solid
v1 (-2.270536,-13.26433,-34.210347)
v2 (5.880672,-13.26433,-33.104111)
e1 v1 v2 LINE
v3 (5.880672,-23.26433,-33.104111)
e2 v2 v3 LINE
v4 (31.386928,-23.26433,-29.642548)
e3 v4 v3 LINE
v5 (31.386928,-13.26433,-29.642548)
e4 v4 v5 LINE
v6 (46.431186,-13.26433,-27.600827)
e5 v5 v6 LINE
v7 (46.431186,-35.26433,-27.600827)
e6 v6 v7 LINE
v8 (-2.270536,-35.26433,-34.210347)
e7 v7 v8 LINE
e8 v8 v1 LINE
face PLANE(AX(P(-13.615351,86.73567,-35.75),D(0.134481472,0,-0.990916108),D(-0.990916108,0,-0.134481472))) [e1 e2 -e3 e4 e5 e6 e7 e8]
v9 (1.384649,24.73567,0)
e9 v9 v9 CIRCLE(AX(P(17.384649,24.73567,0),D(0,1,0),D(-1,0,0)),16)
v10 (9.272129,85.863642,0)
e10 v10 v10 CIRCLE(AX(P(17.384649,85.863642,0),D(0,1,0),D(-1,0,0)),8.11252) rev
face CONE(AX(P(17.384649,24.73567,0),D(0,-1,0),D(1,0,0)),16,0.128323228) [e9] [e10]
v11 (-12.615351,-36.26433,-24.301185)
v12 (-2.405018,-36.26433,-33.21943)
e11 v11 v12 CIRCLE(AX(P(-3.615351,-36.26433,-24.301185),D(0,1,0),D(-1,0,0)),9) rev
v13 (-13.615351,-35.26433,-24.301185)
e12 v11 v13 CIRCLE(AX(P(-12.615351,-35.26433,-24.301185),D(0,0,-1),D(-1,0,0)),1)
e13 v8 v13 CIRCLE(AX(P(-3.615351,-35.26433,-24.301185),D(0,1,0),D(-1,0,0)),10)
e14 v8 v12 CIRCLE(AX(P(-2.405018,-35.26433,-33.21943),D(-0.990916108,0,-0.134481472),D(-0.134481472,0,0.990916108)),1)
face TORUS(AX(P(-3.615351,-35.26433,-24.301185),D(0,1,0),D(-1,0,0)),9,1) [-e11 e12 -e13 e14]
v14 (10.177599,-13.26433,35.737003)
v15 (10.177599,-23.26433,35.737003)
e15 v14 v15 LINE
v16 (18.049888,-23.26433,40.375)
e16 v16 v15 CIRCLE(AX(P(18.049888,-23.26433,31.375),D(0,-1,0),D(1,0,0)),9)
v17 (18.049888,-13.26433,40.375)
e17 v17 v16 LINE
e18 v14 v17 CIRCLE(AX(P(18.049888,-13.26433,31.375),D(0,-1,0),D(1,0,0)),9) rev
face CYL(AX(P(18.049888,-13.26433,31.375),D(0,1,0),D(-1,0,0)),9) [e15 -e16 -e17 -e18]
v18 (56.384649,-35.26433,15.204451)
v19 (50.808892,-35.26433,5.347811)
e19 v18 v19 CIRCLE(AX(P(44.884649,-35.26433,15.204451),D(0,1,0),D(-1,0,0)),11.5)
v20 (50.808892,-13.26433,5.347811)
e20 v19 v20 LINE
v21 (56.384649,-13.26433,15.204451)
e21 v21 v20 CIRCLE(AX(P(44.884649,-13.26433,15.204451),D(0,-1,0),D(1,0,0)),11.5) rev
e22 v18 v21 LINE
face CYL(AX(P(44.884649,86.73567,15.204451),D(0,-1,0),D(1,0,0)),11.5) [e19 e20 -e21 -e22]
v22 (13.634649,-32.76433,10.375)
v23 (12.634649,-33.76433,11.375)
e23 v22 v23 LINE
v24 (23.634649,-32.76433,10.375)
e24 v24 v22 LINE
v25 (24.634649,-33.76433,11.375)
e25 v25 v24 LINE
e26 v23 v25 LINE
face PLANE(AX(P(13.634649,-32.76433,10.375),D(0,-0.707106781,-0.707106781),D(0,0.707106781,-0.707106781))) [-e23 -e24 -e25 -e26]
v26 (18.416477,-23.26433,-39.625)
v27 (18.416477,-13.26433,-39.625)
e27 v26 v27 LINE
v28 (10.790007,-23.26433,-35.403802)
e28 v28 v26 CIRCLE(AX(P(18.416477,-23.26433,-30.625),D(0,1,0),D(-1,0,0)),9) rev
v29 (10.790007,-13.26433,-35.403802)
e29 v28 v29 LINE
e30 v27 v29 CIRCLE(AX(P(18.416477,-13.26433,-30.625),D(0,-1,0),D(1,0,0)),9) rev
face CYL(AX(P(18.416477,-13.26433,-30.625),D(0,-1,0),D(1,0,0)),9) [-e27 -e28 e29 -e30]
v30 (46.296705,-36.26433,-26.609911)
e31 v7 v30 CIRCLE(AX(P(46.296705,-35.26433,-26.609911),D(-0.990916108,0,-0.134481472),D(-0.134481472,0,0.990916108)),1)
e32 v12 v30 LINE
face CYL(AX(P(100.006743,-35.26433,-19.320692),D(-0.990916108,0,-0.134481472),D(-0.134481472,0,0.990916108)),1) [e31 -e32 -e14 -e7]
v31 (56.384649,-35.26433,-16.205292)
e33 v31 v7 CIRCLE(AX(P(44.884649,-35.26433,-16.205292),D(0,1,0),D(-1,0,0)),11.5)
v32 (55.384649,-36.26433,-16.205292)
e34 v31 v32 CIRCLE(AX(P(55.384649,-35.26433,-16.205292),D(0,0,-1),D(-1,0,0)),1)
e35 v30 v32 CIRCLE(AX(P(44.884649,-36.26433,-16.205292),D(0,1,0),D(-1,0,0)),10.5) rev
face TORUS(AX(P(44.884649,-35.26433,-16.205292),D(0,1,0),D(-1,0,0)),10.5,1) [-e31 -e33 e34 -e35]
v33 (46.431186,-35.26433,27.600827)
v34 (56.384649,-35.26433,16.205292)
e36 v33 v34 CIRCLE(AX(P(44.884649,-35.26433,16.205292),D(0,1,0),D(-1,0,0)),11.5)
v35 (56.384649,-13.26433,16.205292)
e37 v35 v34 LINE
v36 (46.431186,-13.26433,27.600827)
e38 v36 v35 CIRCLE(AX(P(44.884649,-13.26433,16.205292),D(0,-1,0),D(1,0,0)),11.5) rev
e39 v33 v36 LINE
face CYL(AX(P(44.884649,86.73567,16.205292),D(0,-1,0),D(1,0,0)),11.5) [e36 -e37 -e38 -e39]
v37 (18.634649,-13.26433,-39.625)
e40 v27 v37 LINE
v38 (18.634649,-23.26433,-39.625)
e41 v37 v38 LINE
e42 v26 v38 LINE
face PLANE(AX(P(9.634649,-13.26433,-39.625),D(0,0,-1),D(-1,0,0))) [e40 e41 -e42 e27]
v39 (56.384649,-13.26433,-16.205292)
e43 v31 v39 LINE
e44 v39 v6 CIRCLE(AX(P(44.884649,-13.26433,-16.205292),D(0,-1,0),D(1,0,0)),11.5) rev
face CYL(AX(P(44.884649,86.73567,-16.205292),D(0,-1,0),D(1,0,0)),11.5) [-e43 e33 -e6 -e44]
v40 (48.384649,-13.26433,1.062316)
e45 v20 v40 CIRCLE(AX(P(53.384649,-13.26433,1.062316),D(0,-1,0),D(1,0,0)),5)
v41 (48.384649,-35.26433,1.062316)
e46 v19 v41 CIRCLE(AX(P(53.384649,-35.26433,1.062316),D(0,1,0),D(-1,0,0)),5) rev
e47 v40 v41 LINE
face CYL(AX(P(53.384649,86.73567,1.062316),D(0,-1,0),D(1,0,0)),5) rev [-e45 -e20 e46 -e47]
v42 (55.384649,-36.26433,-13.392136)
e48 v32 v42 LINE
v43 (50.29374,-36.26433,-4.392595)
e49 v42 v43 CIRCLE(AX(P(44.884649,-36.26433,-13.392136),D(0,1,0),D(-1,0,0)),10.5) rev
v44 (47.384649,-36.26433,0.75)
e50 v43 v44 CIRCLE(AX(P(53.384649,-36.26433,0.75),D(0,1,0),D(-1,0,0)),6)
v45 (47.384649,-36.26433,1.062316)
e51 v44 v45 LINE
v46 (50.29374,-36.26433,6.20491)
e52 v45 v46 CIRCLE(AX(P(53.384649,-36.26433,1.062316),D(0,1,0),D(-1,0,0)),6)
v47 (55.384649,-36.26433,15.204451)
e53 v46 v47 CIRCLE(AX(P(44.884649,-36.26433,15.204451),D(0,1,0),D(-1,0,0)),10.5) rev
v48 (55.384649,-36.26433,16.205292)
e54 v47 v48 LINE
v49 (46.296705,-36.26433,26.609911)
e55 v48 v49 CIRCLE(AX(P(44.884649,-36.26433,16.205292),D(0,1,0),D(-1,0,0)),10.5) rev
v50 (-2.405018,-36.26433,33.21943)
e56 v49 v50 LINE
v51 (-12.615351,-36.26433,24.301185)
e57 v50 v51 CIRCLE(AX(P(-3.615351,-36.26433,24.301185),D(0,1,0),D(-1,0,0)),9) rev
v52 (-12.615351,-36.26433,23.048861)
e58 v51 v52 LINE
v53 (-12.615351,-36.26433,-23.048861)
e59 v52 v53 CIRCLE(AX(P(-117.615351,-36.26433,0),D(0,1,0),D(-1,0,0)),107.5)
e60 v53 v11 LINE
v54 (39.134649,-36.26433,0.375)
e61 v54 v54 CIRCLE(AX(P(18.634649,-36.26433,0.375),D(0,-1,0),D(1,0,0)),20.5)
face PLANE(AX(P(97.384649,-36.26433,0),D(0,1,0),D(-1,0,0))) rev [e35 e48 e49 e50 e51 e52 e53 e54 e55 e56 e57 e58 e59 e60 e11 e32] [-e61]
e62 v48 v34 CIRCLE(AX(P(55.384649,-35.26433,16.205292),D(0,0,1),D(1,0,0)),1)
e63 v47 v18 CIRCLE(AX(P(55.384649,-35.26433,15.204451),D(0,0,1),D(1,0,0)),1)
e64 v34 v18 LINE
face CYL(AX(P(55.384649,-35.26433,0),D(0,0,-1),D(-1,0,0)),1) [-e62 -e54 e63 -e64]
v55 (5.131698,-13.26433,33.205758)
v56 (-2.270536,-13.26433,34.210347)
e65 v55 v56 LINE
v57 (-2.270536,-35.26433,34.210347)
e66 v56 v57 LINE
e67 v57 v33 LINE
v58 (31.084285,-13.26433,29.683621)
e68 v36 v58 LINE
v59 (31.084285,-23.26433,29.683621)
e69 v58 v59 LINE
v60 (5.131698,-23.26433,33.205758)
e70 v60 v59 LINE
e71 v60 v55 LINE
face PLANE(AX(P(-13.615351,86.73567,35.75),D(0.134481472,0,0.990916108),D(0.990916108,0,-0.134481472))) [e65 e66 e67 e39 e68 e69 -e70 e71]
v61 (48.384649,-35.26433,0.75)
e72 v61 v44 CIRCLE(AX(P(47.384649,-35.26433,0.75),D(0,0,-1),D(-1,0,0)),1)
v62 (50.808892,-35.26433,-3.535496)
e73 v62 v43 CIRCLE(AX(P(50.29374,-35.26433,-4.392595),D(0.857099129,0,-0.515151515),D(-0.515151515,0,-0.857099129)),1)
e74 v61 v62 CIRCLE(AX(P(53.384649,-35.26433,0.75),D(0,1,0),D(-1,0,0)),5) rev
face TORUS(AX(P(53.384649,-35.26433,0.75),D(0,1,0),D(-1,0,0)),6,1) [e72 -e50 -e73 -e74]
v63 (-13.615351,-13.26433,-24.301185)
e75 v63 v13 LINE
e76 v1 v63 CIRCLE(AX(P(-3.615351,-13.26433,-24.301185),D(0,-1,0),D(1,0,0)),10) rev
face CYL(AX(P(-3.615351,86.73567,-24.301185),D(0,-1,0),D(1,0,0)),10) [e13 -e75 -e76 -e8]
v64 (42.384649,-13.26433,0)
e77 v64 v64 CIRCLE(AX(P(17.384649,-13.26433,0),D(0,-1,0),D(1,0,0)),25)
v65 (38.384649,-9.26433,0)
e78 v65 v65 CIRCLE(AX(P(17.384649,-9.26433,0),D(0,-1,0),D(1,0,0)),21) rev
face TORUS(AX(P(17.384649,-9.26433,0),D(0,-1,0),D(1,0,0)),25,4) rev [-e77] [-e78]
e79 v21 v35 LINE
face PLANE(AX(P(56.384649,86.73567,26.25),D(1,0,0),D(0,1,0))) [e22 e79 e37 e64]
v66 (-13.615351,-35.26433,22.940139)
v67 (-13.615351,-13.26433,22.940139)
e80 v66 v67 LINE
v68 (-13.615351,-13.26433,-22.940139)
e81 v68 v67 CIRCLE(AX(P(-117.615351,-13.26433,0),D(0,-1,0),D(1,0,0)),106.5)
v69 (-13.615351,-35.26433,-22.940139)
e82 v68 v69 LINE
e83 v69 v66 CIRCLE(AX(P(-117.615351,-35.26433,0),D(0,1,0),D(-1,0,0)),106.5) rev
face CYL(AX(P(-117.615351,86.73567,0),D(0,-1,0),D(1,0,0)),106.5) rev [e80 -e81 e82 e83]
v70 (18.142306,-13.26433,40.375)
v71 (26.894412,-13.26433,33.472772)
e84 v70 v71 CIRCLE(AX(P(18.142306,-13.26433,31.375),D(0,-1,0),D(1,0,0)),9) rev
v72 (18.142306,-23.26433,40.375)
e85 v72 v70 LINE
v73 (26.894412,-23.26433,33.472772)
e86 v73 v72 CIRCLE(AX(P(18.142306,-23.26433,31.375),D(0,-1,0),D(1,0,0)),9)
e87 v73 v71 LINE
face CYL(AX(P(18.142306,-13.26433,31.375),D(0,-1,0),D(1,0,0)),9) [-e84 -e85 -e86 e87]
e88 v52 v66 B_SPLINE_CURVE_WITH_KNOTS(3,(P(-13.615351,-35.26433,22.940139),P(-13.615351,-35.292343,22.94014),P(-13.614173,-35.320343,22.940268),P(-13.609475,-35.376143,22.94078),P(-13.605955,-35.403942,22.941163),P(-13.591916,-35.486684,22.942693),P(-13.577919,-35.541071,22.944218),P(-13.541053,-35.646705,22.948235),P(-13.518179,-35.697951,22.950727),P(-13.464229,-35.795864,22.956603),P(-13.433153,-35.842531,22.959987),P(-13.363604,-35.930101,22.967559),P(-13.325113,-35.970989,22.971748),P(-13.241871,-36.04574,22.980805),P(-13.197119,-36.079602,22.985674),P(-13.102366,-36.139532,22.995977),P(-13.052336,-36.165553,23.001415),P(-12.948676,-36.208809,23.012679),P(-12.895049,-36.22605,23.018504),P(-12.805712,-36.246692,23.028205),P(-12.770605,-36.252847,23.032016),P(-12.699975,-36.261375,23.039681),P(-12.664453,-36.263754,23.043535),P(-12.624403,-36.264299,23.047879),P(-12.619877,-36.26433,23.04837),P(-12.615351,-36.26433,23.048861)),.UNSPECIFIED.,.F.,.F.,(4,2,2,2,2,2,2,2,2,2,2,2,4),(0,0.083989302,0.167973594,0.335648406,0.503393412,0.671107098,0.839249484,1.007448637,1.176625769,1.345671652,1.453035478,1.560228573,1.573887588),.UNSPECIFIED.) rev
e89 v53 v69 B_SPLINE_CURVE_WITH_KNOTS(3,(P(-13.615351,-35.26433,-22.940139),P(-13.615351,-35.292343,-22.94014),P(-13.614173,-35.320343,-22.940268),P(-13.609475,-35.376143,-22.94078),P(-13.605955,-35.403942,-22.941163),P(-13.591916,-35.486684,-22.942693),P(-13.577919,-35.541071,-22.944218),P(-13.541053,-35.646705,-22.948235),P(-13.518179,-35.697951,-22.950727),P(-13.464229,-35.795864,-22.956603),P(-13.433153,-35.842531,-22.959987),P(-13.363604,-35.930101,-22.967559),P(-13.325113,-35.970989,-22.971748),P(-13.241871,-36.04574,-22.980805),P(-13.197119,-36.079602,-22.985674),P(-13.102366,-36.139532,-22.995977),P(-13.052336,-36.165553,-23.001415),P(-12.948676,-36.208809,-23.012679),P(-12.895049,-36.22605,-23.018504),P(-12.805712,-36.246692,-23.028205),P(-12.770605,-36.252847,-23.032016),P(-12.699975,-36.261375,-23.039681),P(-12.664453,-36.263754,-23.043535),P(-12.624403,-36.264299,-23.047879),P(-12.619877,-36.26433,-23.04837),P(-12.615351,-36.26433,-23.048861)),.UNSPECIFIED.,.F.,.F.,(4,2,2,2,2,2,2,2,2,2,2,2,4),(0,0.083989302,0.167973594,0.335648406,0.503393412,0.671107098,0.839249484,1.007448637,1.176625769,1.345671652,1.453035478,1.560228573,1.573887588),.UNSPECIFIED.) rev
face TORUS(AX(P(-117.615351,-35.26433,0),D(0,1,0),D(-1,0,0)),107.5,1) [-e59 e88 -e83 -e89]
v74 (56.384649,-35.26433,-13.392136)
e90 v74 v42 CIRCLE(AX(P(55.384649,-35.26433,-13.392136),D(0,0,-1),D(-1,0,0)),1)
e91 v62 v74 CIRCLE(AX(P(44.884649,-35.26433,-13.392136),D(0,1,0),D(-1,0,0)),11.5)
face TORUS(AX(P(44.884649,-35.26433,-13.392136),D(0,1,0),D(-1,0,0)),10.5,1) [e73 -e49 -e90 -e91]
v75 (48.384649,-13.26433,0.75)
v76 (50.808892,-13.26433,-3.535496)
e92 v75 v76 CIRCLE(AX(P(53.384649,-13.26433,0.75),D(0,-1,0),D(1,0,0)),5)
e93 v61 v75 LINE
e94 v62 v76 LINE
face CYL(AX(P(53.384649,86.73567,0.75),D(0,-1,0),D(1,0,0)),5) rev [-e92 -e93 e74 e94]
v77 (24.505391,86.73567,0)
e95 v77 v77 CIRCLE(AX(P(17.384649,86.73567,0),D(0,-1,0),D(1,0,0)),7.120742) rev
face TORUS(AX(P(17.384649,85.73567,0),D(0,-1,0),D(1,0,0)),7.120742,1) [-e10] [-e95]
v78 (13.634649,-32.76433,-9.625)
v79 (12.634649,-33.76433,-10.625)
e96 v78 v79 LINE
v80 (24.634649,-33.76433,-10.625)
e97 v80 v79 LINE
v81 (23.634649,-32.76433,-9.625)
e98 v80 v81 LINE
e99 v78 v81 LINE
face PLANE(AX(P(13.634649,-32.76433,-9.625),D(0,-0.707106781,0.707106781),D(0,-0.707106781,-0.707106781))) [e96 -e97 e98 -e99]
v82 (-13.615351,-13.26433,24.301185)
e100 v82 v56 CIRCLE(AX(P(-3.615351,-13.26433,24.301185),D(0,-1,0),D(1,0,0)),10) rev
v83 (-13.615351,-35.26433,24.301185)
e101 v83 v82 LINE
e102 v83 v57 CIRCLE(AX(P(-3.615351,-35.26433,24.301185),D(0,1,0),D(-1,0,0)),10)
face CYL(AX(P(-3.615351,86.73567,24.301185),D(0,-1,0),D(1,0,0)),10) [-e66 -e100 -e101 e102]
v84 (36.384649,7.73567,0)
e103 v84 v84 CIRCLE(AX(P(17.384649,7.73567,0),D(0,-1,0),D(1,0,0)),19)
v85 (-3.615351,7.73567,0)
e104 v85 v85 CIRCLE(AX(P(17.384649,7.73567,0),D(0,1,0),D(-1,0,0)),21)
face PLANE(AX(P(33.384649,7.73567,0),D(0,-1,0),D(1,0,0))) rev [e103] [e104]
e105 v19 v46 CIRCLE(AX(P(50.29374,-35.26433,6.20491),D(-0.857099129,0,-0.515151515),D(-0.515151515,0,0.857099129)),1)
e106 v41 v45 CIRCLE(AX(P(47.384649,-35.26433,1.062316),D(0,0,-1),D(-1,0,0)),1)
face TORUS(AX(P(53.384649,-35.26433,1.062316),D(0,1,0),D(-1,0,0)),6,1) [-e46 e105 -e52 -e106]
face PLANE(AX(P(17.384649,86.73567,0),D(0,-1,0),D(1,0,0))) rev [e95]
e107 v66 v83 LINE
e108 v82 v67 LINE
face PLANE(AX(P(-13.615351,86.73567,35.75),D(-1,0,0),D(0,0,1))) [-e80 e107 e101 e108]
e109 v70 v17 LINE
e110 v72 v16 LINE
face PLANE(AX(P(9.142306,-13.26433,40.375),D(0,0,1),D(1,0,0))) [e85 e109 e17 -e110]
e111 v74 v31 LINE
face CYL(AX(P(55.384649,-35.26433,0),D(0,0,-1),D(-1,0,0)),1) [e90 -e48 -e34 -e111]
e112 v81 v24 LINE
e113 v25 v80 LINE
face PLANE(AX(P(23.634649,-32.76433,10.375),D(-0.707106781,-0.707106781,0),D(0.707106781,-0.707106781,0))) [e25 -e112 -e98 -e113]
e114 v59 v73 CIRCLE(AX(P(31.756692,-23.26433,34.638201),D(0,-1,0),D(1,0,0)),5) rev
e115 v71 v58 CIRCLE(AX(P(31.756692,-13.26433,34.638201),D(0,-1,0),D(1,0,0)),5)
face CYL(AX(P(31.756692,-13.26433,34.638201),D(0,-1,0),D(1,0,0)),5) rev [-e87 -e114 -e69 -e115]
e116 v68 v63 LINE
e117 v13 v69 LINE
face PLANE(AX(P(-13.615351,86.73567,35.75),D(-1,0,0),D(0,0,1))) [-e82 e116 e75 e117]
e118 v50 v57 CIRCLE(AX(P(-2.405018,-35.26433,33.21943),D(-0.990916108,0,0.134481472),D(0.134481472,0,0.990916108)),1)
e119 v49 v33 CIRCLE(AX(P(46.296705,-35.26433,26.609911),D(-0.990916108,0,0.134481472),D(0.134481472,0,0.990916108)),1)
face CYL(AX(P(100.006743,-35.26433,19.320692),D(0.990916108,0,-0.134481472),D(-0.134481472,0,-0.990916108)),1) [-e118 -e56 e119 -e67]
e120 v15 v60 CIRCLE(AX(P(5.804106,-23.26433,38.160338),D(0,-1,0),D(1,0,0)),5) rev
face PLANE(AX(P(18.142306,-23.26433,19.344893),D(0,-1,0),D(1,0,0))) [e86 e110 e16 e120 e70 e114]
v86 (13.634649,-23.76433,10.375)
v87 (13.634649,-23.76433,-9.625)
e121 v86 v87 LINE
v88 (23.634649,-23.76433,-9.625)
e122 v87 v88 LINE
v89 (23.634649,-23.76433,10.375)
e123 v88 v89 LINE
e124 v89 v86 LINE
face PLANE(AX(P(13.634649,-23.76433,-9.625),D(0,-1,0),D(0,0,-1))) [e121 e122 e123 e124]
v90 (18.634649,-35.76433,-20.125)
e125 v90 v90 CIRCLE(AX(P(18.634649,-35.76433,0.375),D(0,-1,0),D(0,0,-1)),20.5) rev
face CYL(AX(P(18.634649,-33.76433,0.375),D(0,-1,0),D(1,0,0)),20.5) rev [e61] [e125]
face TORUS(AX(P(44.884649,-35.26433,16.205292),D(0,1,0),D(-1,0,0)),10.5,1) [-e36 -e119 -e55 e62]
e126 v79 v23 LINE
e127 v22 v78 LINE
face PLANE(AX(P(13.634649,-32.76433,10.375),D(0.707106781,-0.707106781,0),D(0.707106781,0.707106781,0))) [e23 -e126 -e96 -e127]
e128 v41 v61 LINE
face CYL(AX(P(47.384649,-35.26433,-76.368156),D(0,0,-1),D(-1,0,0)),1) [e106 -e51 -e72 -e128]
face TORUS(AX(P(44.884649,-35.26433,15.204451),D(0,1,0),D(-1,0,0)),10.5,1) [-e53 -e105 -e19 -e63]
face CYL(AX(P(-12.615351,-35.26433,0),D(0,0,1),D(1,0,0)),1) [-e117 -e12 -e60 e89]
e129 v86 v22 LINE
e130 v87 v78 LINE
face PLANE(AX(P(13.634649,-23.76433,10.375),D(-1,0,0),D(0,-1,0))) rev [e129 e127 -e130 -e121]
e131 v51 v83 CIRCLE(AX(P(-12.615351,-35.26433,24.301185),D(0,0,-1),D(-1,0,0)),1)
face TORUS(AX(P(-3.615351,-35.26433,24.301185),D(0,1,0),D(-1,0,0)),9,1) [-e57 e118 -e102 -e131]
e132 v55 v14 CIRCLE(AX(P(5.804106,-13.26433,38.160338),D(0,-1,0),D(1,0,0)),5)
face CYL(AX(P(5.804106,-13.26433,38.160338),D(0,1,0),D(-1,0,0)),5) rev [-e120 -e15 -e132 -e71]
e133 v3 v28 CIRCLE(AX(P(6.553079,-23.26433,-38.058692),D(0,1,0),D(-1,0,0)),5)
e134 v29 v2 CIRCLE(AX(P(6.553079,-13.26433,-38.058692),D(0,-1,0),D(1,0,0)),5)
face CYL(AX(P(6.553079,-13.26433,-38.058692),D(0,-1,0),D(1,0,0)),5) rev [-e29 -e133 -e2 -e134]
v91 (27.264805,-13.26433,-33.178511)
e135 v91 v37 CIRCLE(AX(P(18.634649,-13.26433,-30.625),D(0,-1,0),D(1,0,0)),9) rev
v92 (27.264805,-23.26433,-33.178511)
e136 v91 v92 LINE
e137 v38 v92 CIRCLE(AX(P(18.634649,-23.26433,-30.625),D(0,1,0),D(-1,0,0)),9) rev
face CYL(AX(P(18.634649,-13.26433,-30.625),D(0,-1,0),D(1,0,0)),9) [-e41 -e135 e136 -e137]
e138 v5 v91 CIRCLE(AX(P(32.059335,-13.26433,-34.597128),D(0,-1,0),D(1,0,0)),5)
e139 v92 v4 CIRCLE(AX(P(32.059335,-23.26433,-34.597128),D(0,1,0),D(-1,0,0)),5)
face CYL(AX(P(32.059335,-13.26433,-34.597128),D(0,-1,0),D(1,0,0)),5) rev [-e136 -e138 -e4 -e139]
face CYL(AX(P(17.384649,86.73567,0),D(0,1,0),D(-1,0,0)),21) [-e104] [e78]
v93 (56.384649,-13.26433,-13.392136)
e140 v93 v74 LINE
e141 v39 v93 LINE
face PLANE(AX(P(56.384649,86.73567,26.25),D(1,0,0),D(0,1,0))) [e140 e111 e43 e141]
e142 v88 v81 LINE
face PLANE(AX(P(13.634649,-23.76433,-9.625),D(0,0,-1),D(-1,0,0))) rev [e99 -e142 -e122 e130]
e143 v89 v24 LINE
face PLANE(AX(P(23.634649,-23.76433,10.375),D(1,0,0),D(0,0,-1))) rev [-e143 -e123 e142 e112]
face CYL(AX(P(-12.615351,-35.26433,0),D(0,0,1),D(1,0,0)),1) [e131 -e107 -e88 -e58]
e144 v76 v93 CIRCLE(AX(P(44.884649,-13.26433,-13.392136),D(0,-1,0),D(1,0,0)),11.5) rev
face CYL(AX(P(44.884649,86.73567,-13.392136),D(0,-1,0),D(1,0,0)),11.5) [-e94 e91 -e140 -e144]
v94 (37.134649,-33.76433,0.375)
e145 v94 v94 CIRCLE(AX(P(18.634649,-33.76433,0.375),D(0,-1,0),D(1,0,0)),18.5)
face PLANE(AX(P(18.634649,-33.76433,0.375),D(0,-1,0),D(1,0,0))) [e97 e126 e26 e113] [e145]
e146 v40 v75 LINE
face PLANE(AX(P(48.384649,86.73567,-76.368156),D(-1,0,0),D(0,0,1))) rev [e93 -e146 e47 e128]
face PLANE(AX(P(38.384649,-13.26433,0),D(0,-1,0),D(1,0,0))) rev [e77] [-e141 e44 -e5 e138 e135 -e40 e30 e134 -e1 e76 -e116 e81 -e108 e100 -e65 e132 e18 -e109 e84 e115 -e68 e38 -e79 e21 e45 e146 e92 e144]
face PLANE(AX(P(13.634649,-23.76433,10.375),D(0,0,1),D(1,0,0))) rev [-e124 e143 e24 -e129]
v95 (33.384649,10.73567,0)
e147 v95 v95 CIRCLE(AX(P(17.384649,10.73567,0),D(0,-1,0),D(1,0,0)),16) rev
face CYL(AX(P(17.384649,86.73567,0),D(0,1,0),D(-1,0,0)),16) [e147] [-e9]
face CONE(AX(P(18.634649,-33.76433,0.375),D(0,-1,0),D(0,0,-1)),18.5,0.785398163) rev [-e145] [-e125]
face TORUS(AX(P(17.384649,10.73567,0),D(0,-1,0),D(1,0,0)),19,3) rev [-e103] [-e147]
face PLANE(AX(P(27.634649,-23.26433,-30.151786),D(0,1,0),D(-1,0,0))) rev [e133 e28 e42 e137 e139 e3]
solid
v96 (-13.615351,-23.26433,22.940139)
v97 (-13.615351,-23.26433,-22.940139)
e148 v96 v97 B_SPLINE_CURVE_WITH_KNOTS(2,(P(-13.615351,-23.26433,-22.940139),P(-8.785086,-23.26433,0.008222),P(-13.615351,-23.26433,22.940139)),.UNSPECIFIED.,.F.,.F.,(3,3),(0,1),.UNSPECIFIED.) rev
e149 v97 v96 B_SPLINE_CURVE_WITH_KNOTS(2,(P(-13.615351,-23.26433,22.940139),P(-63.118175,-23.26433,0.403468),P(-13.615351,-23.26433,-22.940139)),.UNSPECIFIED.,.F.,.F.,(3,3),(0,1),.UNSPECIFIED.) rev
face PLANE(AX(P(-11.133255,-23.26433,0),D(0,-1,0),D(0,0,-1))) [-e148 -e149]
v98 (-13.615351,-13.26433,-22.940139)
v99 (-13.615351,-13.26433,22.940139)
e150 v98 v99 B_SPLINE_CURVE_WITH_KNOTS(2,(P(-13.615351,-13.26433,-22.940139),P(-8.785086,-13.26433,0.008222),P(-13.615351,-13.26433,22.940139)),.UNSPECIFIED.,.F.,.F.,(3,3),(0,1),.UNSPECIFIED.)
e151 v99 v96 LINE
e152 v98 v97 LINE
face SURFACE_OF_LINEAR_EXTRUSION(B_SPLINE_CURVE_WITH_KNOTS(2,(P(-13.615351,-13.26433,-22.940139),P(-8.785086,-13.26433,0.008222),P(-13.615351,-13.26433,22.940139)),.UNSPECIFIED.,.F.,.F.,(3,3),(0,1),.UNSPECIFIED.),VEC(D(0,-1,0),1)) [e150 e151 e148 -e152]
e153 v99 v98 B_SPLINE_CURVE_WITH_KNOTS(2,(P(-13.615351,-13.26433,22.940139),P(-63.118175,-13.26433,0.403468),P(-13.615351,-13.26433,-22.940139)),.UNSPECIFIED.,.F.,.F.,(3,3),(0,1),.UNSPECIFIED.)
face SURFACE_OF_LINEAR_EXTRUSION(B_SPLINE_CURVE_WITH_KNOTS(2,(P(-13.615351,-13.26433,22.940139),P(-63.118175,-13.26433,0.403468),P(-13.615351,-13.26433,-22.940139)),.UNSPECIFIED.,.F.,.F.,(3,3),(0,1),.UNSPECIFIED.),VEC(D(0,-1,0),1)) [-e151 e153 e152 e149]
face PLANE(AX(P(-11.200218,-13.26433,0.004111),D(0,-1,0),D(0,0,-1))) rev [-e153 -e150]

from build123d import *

# Parameters (mm, degrees)
ESBO_O2_OUTSIDE_W        = 213.508
ESBO_O2_OUTSIDE_H        = 213.508
CORTE_EXTRUS_O2_DEPTH    = 177.104428981
ESBO_O3_R                = 106.5
CORTE_EXTRUS_O3_DEPTH    = 140.951031327
FILETE1_R                = 10
ESBO_O4_W                = 8
ESBO_O4_H                = 4.25
CORTE_EXTRUS_O4_DEPTH    = 140.587965081
FILETE2_R                = 11.5
FILETE3_R                = 11.5
FILETE4_R                = 5
FILETE5_R                = 5
FILETE6_R                = 11.5
FILETE7_R                = 4
FILETE8_R                = 3
FILETE10_R               = 1
ESBO_O5_R                = 20.5
CORTE_EXTRUS_O6_DEPTH    = 2.5
CHANFRO1_SIZE            = 2
ESBO_O6_W                = 10
ESBO_O6_H                = 20
CORTE_EXTRUS_O7_DEPTH    = 10
CHANFRO2_SIZE            = 1
RESSALTO_EXTRUS_O2_DEPTH = 23
CORTE_EXTRUS_O10_DEPTH   = 13
CORTE_EXTRUS_O11_DEPTH   = 13
FILETE11_R               = 9
FILETE12_R               = 5
FILETE15_R               = 5
FILETE16_R               = 9
FILETE17_R               = 5
FILETE18_R               = 5
RESSALTO_EXTRUS_O4_DEPTH = 23
CORTE_EXTRUS_O12_DEPTH   = 13
FILETE20_R               = 1


with BuildPart() as part:
    # Esboço1 → Revolução1 (revolve)
    with BuildSketch(Plane.XY, mode=Mode.PRIVATE) as revolu_o1_sk:
        Polygon((17.384649235, 86.73567042), (25.384649235, 86.73567042), (33.384649235, 24.73567042), (33.384649235, 7.73567042), (38.384649235, 7.73567042), (38.384649235, -13.26432958), (97.384649235, -13.26432958), (97.384649235, -36.26432958), (17.384649235, -36.26432958), align=None)
    revolve(revolu_o1_sk.sketch.rotate(Axis((17.384649235, 86.73567042, 0), (0, -1, 0)), 180), axis=Axis((17.384649235, 86.73567042, 0), (0, -1, 0)))

    # Esboço2 outside → Corte-extrusão2 (cut, through all)
    with BuildSketch(Plane.XZ.offset(36.26432958)):
        with Locations((17.385, 0)):
            Rectangle(ESBO_O2_OUTSIDE_W, ESBO_O2_OUTSIDE_H)
        Polygon((56.384649235, 26.25), (56.384649235, -26.25), (-13.615350765, -35.75), (-13.615350765, 35.75), align=None, mode=Mode.SUBTRACT)
    extrude(amount=-CORTE_EXTRUS_O2_DEPTH, mode=Mode.SUBTRACT)

    # Esboço3 → Corte-extrusão3 (cut, through all)
    with BuildSketch(Plane.XZ.offset(36.26432958)):
        with Locations((-117.615350765, 0)):
            Circle(ESBO_O3_R)
    extrude(amount=-CORTE_EXTRUS_O3_DEPTH, mode=Mode.SUBTRACT)

    # Filete1
    filete1_edges = [part.edges().sort_by_distance(p)[0] for p in [
        (-13.615350765, -24.76432958, -35.75),
        (-13.615350765, -24.76432958, 35.75),
    ]]
    fillet(filete1_edges, radius=FILETE1_R)

    # Esboço4 → Corte-extrusão4 (cut, through all)
    with BuildSketch(Plane.XZ.offset(36.26432958)):
        with Locations((52.384649235, 2.125)):
            Rectangle(ESBO_O4_W, ESBO_O4_H)
        with Locations((52.384649235, -2.125)):
            Rectangle(ESBO_O4_W, ESBO_O4_H)
    extrude(amount=-CORTE_EXTRUS_O4_DEPTH, mode=Mode.SUBTRACT)

    # Filete2
    filete2_edges = [part.edges().sort_by_distance(p)[0] for p in [
        (56.384649235, -24.76432958, 26.25),
    ]]
    fillet(filete2_edges, radius=FILETE2_R)

    # Filete3
    # the kernel refuses this fillet: 11.5 mm, written as the material it takes off along each edge
    with BuildSketch(Plane(origin=(56.384649235, -63.650457456, 4.25), x_dir=(0, 0, 1), z_dir=(0, 1, 0))) as filete3_piece_1:
        with BuildLine():
            CenterArc((10.95445115, -11.5), FILETE3_R, 90, 72.281068127)
            Line((0, -8), (-0.219089023, -7.93))
            ThreePointArc((-0.219089023, -7.93), (-0.23, -4), (-0.23, 0))
            Line((-0.23, 0), (0, 0.23))
            Line((0, 0.23), (10.95445115, 0.23))
            Line((10.95445115, 0.23), (10.95445115, 0))
        make_face()
    extrude(amount=77.772255751, mode=Mode.SUBTRACT)

    # Filete4
    filete4_edges = [part.edges().sort_by_distance(p)[0] for p in [
        (48.384649235, -24.76432958, 4.25),
    ]]
    fillet(filete4_edges, radius=FILETE4_R)

    # Filete5
    filete5_edges = [part.edges().sort_by_distance(p)[0] for p in [
        (48.384649235, -24.76432958, -4.25),
    ]]
    fillet(filete5_edges, radius=FILETE5_R)

    # Filete6
    filete6_edges = [part.edges().sort_by_distance(p)[0] for p in [
        (56.384649235, -24.76432958, -26.25),
        (56.384649235, -24.76432958, -4.25),
    ]]
    fillet(filete6_edges, radius=FILETE6_R)

    # Filete7
    filete7_edges = [part.edges().sort_by_distance(p)[0] for p in [
        (38.384649235, -13.26432958, 0),
    ]]
    fillet(filete7_edges, radius=FILETE7_R)

    # Filete8
    filete8_edges = [part.edges().sort_by_distance(p)[0] for p in [
        (33.384649235, 7.73567042, 0),
    ]]
    fillet(filete8_edges, radius=FILETE8_R)

    # Filete10
    filete10_edges = [part.edges().sort_by_distance(p)[0] for p in [
        (54.894114452, -36.26432958, 9.542242565),
        (49.032707836, -36.26432958, 3.524145346),
        (56.384649235, -36.26432958, -14.798713755),
        (49.032707836, -36.26432958, -1.71182982),
        (54.894114452, -36.26432958, -7.729927039),
        (53.545918618, -36.26432958, -23.770502568),
        (-13.615350765, -36.26432958, -23.620662492),
        (-11.115350765, -36.26432958, 0),
        (-13.615350765, -36.26432958, 23.620662492),
        (22.080325057, -36.26432958, -30.905586853),
        (-10.193794837, -36.26432958, 31.832724085),
        (-10.193794837, -36.26432958, -31.832724085),
        (22.080325057, -36.26432958, 30.905586853),
        (53.545918618, -36.26432958, 23.770502568),
        (56.384649235, -36.26432958, 15.704871518),
        (48.384649235, -36.26432958, 0.906157763),
    ]]
    fillet(filete10_edges, radius=FILETE10_R)

    # Esboço5 → Corte-extrusão6 (cut)
    with BuildSketch(Plane.XZ.offset(36.26432958)):
        with Locations((18.634649235, 0.375)):
            Circle(ESBO_O5_R)
    extrude(amount=-CORTE_EXTRUS_O6_DEPTH, mode=Mode.SUBTRACT)

    # Chanfro1
    chanfro1_edges = [part.edges().sort_by_distance(p)[0] for p in [
        (-1.865350765, -33.76432958, 0.375),
    ]]
    chamfer(chanfro1_edges, length=CHANFRO1_SIZE)

    # Esboço6 → Corte-extrusão7 (cut)
    with BuildSketch(Plane.XZ.offset(33.76432958)):
        with Locations((18.634649235, 0.375)):
            Rectangle(ESBO_O6_W, ESBO_O6_H)
    extrude(amount=-CORTE_EXTRUS_O7_DEPTH, mode=Mode.SUBTRACT)

    # Chanfro2
    chanfro2_edges = [part.edges().sort_by_distance(p)[0] for p in [
        (13.634649235, -33.76432958, 0.375),
        (18.634649235, -33.76432958, -9.625),
        (23.634649235, -33.76432958, 0.375),
        (18.634649235, -33.76432958, 10.375),
    ]]
    chamfer(chanfro2_edges, length=CHANFRO2_SIZE)

    # Esboço7 → Ressalto-extrusão2 (add)
    with BuildSketch(Plane.XZ.offset(36.26432958)):
        Polygon((9.142306031, 40.375), (27.142306031, 40.375), (27.142306031, 30.218603721), (9.142306031, 32.661460863), align=None)
        Polygon((9.634649235, -39.625), (27.634649235, -39.625), (27.634649235, -30.151785714), (9.634649235, -32.594642857), align=None)
    extrude(amount=-RESSALTO_EXTRUS_O2_DEPTH)

    # Esboço8 → Corte-extrusão10 (cut)
    with BuildSketch(Plane.XZ.offset(36.26432958)):
        Polygon((27.142306031, 40.375), (9.142306031, 40.375), (9.142306031, 32.661460863), (27.142306031, 30.218603721), align=None)
    extrude(amount=-CORTE_EXTRUS_O10_DEPTH, mode=Mode.SUBTRACT)

    # Esboço9 → Corte-extrusão11 (cut)
    with BuildSketch(Plane.XZ.offset(36.26432958)):
        Polygon((9.634649235, -32.594642857), (9.634649235, -45.906796795), (27.980618012, -45.906796795), (27.634649235, -30.151785714), align=None)
    extrude(amount=-CORTE_EXTRUS_O11_DEPTH, mode=Mode.SUBTRACT)

    # Filete11
    # the kernel refuses this fillet: 9 mm, written as the material it takes off along each edge
    with BuildSketch(Plane(origin=(9.142306031, -45.533284771, 40.375), x_dir=(1, 0, 0), z_dir=(0, 1, 0))) as filete11_piece_1:
        with BuildLine():
            CenterArc((8.907582076, 9), FILETE11_R, 188.218012846, 81.781987154)
            Line((0, 7.713539137), (-0.178151642, 7.687809919))
            ThreePointArc((-0.178151642, 7.687809919), (-0.18, 3.856769568), (-0.18, 0))
            Line((-0.18, 0), (0, -0.18))
            Line((0, -0.18), (8.907582076, -0.18))
            Line((8.907582076, -0.18), (8.907582076, 0))
        make_face()
    extrude(amount=54.537910382, mode=Mode.SUBTRACT)
    with BuildSketch(Plane(origin=(27.142306031, -45.76432958, 40.375), x_dir=(0, 0, -1), z_dir=(0, 1, 0))) as filete11_piece_2:
        with BuildLine():
            CenterArc((FILETE11_R, FILETE11_R), FILETE11_R, 180, 90)
            Line((0, FILETE11_R), (-FILETE11_R * 0.02, FILETE11_R))
            Line((-FILETE11_R * 0.02, FILETE11_R), (-FILETE11_R * 0.02, -FILETE11_R * 0.02))
            Line((-FILETE11_R * 0.02, -FILETE11_R * 0.02), (FILETE11_R, -FILETE11_R * 0.02))
            Line((FILETE11_R, -FILETE11_R * 0.02), (FILETE11_R, 0))
        make_face()
    extrude(amount=55, mode=Mode.SUBTRACT)

    # Filete12
    # the kernel refuses this fillet: 5 mm, written as the material it adds along each edge
    with BuildSketch(Plane(origin=(27.142306031, -23.26432958, 30.218603721), x_dir=(0.9909161083213732, 0, -0.13448147184361356), z_dir=(0, 1, 0))) as filete12_piece_1:
        with BuildLine():
            CenterArc((3.9781158, -5), FILETE12_R, 90, 68.792548133)
            Line((-0.683268003, -3.191270877), (-1.149406384, -3.010397964))
            ThreePointArc((-1.149406384, -3.010397964), (-0.650971928, -1.078650965), (-0.495458054, 0.067240736))
            Line((-0.495458054, 0.067240736), (0, 0.5))
            Line((0, 0.5), (3.9781158, 0.5))
            Line((3.9781158, 0.5), (3.9781158, 0))
        make_face()
    extrude(amount=10)

    # Filete15
    filete15_edges = [part.edges().sort_by_distance(p)[0] for p in [
        (9.142306031, -18.26432958, 32.661460863),
    ]]
    fillet(filete15_edges, radius=FILETE15_R)

    # Filete16
    # the kernel refuses this fillet: 9 mm, written as the material it takes off along each edge
    with BuildSketch(Plane(origin=(9.634649235, -45.218900149, -39.625), x_dir=(1, 0, 0), z_dir=(0, 1, 0))) as filete16_piece_1:
        with BuildLine():
            CenterArc((8.781828227, -9), FILETE16_R, 90, 77.358549655)
            Line((0, -7.030357143), (-0.175636565, -6.990964286))
            ThreePointArc((-0.175636565, -6.990964286), (-0.18, -3.515178571), (-0.18, 0))
            Line((-0.18, 0), (0, 0.18))
            Line((0, 0.18), (8.781828227, 0.18))
            Line((8.781828227, 0.18), (8.781828227, 0))
        make_face()
    extrude(amount=53.909141137, mode=Mode.SUBTRACT)
    with BuildSketch(Plane(origin=(27.634649235, -45.76432958, -39.625), x_dir=(0, 0, 1), z_dir=(0, 1, 0))) as filete16_piece_2:
        with BuildLine():
            CenterArc((FILETE16_R, -FILETE16_R), FILETE16_R, 90, 90)
            Line((0, -FILETE16_R), (-FILETE16_R * 0.02, -FILETE16_R))
            Line((-FILETE16_R * 0.02, -FILETE16_R), (-FILETE16_R * 0.02, FILETE16_R * 0.02))
            Line((-FILETE16_R * 0.02, FILETE16_R * 0.02), (FILETE16_R, FILETE16_R * 0.02))
            Line((FILETE16_R, FILETE16_R * 0.02), (FILETE16_R, 0))
        make_face()
    extrude(amount=55, mode=Mode.SUBTRACT)

    # Filete17
    # the kernel refuses this fillet: 5 mm, written as the material it adds along each edge
    with BuildSketch(Plane(origin=(27.634649235, -23.26432958, -30.151785714), x_dir=(0.990916108321373, 0, 0.13448147184361506), z_dir=(0, 1, 0))) as filete17_piece_1:
        with BuildLine():
            CenterArc((3.786676456, 5), FILETE17_R, 204.211195722, 65.788804278)
            Line((-0.773523538, 2.949493719), (-1.229543538, 2.74444309))
            ThreePointArc((-1.229543538, 2.74444309), (-0.559096608, 0.401674922), (-0.495458054, -0.067240736))
            Line((-0.495458054, -0.067240736), (0, -0.5))
            Line((0, -0.5), (3.786676456, -0.5))
            Line((3.786676456, -0.5), (3.786676456, 0))
        make_face()
    extrude(amount=10)

    # Filete18
    filete18_edges = [part.edges().sort_by_distance(p)[0] for p in [
        (9.634649235, -18.26432958, -32.594642857),
    ]]
    fillet(filete18_edges, radius=FILETE18_R)

    # Filete20
    filete20_edges = [part.edges().sort_by_distance(p)[0] for p in [
        (25.384649235, 86.73567042, 0),
    ]]
    fillet(filete20_edges, radius=FILETE20_R)


with BuildPart() as body_2:
    # Esboço10 → Ressalto-extrusão4 (new body)
    with BuildSketch(Plane.XZ.offset(36.26432958)):
        with BuildLine():
            add(Edge.make_bspline(
                [(-13.615350765, 22.940139494), (-63.118175141, 0.403467916), (-13.615350765, -22.940139494)],
                knots=[0, 0, 0, 1, 1, 1], degree=2))
            add(Edge.make_bspline(
                [(-13.615350765, 22.940139494), (-8.785086194, 0.008221789), (-13.615350765, -22.940139494)],
                knots=[0, 0, 0, 1, 1, 1], degree=2))
        make_face()
    extrude(amount=-RESSALTO_EXTRUS_O4_DEPTH)

    # Esboço11 → Corte-extrusão12 (cut)
    with BuildSketch(Plane.XZ.offset(36.26432958)):
        with BuildLine():
            Line((-13.615350765, -22.940139494), (-48.355653305, -22.940139494))
            Line((-48.355653305, -22.940139494), (-48.355653305, 22.940139494))
            Line((-48.355653305, 22.940139494), (-13.615350765, 22.940139494))
            add(Edge.make_bspline(
                [(-13.615350765, 22.940139494), (-8.651158456, 0), (-13.615350765, -22.940139494)],
                knots=[0, 0, 0, 1, 1, 1], degree=2))
        make_face()
    extrude(amount=-CORTE_EXTRUS_O12_DEPTH, mode=Mode.SUBTRACT)


solid = Compound([part.part, body_2.part])
